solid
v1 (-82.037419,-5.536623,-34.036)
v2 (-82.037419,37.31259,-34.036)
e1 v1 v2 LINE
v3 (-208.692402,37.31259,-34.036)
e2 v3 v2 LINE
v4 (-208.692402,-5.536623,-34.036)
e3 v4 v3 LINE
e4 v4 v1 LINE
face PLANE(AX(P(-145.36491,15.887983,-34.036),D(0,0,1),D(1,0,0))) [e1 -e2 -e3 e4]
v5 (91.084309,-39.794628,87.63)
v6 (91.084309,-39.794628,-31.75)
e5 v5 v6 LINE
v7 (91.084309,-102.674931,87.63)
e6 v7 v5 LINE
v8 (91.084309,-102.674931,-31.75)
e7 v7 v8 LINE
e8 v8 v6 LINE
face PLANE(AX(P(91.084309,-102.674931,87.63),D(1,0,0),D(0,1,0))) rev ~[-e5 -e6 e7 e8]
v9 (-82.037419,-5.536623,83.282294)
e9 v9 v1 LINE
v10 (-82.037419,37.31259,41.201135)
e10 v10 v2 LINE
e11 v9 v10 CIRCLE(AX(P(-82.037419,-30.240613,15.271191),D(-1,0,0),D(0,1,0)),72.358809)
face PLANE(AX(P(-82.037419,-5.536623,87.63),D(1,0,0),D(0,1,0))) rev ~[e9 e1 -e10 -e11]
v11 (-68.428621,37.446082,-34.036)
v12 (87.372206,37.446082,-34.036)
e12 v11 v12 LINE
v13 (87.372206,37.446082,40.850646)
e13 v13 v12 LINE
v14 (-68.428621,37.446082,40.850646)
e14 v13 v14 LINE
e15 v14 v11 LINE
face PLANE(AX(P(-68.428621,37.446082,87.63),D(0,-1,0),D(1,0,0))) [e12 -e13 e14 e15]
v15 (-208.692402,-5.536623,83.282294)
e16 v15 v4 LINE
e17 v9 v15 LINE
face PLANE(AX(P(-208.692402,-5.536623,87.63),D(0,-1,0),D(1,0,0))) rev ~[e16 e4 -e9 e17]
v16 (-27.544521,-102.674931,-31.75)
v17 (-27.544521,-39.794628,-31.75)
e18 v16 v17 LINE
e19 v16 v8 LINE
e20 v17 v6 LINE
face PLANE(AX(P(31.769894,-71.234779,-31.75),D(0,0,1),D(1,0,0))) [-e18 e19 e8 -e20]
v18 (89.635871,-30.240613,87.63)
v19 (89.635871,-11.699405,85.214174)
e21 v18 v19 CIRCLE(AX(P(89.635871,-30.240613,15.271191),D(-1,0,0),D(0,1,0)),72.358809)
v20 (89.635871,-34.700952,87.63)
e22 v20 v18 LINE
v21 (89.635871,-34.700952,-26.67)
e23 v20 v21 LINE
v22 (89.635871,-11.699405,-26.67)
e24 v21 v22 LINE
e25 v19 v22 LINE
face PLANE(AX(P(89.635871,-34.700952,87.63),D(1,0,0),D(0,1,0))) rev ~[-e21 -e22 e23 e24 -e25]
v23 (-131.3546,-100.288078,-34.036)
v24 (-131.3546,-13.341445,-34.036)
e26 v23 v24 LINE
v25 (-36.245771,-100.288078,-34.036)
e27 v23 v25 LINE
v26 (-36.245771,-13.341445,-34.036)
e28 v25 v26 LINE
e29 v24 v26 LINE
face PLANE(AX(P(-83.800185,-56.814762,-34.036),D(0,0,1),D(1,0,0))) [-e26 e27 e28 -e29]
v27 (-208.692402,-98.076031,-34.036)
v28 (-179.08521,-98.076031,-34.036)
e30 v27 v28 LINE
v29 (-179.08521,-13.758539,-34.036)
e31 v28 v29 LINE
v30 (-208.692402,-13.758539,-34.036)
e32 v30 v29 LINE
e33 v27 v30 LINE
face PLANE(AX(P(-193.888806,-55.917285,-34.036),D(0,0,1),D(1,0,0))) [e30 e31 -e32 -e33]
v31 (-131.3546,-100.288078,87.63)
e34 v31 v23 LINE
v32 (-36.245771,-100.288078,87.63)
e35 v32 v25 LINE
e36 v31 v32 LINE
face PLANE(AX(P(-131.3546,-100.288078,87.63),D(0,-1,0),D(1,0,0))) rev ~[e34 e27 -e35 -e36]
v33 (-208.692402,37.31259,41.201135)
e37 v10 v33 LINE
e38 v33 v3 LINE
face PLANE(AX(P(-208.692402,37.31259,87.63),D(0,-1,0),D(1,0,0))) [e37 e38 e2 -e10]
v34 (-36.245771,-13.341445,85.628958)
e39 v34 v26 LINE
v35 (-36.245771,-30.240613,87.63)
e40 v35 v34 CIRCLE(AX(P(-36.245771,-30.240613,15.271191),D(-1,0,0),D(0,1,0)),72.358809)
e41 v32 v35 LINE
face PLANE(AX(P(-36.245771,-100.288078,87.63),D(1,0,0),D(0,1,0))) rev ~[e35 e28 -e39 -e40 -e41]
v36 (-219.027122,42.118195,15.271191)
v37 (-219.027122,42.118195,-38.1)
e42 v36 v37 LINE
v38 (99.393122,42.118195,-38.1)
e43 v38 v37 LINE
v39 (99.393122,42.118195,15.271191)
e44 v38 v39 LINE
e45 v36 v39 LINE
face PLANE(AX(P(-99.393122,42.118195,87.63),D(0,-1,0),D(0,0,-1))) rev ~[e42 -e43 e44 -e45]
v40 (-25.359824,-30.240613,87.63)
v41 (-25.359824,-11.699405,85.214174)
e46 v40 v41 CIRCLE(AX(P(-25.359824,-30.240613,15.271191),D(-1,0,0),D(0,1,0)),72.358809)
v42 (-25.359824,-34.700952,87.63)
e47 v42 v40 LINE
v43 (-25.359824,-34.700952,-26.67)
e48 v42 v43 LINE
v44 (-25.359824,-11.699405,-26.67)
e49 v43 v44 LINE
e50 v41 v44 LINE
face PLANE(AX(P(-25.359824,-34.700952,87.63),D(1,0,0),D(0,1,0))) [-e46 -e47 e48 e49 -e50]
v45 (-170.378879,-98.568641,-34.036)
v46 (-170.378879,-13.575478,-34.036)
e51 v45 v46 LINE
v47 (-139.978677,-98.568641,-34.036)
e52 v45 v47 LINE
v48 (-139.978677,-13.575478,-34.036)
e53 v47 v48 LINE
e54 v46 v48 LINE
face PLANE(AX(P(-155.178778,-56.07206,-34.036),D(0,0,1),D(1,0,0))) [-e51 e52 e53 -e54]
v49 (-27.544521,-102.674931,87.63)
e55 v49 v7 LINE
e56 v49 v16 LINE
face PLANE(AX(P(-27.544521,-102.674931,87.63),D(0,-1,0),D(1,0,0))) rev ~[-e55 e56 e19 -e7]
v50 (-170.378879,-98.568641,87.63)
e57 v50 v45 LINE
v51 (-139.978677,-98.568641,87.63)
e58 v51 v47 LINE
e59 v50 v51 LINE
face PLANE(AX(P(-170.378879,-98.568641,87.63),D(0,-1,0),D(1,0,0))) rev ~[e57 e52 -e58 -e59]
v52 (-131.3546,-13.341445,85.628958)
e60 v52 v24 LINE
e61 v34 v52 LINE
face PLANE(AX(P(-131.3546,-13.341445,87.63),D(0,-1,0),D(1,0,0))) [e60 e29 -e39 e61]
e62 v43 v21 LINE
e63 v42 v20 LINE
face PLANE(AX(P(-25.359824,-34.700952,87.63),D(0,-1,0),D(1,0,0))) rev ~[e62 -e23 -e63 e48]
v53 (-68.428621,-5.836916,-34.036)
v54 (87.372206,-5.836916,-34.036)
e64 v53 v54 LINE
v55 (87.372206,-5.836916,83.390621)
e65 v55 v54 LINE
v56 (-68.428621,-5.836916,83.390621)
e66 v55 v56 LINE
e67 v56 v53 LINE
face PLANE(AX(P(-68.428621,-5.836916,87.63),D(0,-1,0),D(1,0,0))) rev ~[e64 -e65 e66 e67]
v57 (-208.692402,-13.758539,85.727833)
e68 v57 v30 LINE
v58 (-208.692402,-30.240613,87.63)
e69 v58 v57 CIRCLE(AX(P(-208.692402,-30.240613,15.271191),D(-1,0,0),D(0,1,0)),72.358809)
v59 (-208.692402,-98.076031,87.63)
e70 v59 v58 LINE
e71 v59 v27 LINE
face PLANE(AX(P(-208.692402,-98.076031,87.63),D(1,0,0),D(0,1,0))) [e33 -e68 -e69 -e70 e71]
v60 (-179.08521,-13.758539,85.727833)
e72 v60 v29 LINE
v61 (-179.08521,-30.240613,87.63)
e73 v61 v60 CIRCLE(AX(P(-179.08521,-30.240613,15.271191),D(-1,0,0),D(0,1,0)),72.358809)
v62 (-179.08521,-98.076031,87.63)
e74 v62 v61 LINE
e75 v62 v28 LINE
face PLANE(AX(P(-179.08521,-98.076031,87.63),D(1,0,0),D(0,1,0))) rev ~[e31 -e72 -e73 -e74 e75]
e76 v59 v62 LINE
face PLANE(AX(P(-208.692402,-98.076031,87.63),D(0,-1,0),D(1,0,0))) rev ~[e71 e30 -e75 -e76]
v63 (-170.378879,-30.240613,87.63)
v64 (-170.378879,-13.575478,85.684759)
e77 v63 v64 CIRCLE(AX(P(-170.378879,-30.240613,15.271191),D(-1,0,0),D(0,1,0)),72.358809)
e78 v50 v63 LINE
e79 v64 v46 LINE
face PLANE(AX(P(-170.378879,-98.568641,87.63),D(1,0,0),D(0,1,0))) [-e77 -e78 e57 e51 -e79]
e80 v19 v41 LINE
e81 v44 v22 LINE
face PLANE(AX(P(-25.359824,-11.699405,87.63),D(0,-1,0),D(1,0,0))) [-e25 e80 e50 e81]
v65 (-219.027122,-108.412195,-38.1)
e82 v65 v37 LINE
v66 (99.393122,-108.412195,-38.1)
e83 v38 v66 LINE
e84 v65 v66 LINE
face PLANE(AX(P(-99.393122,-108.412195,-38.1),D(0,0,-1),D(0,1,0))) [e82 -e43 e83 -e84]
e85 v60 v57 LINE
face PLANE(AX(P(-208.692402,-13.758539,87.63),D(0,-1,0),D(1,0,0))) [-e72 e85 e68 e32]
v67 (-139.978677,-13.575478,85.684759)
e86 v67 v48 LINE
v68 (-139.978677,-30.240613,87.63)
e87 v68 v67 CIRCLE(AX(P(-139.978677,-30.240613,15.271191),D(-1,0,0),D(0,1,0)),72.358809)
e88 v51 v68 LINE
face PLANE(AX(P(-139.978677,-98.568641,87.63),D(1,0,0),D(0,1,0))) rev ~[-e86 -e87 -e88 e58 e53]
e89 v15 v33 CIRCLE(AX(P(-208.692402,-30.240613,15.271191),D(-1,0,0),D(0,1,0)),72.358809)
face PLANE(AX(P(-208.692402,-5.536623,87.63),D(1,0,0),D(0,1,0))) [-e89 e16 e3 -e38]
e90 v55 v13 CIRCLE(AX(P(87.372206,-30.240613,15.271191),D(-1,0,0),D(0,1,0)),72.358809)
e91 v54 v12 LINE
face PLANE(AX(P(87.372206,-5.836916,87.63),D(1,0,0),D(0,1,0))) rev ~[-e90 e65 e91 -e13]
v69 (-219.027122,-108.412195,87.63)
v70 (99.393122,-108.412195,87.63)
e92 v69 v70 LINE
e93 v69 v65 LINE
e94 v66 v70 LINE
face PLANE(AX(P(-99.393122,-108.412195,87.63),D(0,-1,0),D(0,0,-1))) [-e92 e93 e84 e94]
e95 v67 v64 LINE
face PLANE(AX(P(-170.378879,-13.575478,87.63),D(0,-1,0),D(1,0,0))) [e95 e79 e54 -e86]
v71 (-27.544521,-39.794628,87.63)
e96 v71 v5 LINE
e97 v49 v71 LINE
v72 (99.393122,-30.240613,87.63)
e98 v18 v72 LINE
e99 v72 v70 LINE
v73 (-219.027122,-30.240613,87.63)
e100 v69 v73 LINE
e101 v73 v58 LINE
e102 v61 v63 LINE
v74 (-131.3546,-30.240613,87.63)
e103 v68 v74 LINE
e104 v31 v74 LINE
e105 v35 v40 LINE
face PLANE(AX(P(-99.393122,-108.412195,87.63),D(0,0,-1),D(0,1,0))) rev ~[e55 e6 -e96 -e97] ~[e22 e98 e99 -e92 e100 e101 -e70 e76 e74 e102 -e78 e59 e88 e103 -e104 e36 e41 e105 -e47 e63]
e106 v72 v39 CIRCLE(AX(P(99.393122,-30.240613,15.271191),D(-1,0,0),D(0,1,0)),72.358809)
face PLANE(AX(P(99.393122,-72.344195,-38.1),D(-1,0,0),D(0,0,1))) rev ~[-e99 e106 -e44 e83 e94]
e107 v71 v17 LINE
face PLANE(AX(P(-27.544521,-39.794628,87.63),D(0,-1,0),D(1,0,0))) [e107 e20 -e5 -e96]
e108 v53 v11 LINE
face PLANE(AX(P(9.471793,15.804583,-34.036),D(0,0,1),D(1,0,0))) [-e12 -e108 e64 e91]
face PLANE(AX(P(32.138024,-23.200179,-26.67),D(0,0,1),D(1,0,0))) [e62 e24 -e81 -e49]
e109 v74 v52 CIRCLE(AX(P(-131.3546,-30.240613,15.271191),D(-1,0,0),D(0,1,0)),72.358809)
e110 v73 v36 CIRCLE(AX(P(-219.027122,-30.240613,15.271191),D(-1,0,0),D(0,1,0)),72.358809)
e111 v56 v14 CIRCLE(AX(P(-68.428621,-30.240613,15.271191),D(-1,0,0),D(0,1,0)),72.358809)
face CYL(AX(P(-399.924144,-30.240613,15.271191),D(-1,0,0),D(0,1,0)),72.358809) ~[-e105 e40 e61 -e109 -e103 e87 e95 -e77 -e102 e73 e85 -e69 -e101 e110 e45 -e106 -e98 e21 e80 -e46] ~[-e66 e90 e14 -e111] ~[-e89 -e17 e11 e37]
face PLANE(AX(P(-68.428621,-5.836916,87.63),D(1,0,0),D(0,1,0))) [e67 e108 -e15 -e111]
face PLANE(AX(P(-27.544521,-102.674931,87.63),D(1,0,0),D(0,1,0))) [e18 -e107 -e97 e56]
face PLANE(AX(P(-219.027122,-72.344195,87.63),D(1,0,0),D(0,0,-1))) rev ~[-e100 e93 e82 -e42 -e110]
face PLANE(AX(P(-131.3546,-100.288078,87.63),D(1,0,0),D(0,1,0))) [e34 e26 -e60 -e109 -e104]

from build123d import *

# Parameters (mm, degrees)
F0_W         = 198.7862437963
F0_H         = 84.2363908887
F1_DEPTH     = 87.63
F2_DEPTH     = 30.226
F3_DEPTH     = 38.1
F4_DEPTH     = 36.068
F5_W         = 118.6288297176
F5_H         = 62.8803037107
F6_DEPTH     = 119.38
F7_W         = 114.9956956506
F7_H         = 23.0015479028
F8_DEPTH     = 114.3
F9_DEPTH     = 216.916
F10_DEPTH    = 97.282
F11_W        = 95.1088294387
F11_H        = 86.9466327131
F14_DEPTH    = 121.666
F12_W        = 30.4002016783
F12_H        = 84.9931621924
F15_DEPTH    = 121.666
F13_W        = 29.6071916819
F13_H        = 84.3174913898
F16_DEPTH    = 121.666
F18_W        = 155.8008268476
F18_H        = 43.2829973288
F19_DEPTH    = 121.666
F17_W        = 126.6549825668
F17_H        = 42.8492124192
F20_DEPTH    = 121.666
F21_T1_DEPTH = 680.2142882536


# Not quite as in the source:
# - a fillet or chamfer that OpenCascade refuses, or shapes differently, is made with other operations: its cross-section is extruded or revolved along the edge and cut away or added


with BuildPart() as f1:
    # F0 (on Top) → F1 (new body)
    with BuildSketch(Plane.XY):
        Rectangle(F0_W, F0_H)
    extrude(amount=F1_DEPTH)

    # F2 (add): a face of the model
    f2_faces = [f1.faces().sort_by_distance(p)[0] for p in [
        (0, -42.1181954443, 43.815),
    ]]
    extrude(f2_faces, amount=F2_DEPTH)

    # F3 (add): a face of the model
    f3_faces = [f1.faces().sort_by_distance(p)[0] for p in [
        (0, -15.113, 0),
    ]]
    extrude(f3_faces, amount=F3_DEPTH)

    # F4 (add): a face of the model
    f4_faces = [f1.faces().sort_by_distance(p)[0] for p in [
        (0, -72.3441954443, 24.765),
    ]]
    extrude(f4_faces, amount=F4_DEPTH)

    # F5 (on face) → F6 (cut)
    with BuildSketch(Plane.XY.offset(87.63)):
        with Locations((31.7698940635, -71.2347794324)):
            Rectangle(F5_W, F5_H)
    extrude(amount=-F6_DEPTH, mode=Mode.SUBTRACT)

    # F7 (on face) → F8 (cut)
    with BuildSketch(Plane.XY.offset(87.63)):
        with Locations((32.1380235255, -23.2001785189)):
            Rectangle(F7_W, F7_H)
    extrude(amount=-F8_DEPTH, mode=Mode.SUBTRACT)

    # F9 (add): a face of the model
    f9_faces = [f1.faces().sort_by_distance(p)[0] for p in [
        (-99.3931218982, -33.147, 24.765),
    ]]
    extrude(f9_faces, amount=F9_DEPTH)

    # F10 (cut): a face of the model
    f10_faces = [f1.faces().sort_by_distance(p)[0] for p in [
        (-316.3091218982, -33.147, 24.765),
    ]]
    extrude(f10_faces, amount=-F10_DEPTH, mode=Mode.SUBTRACT)

    # F11 (on face) → F14 (cut)
    with BuildSketch(Plane.XY.offset(87.63)):
        with Locations((-83.8001854718, -56.8147618324)):
            Rectangle(F11_W, F11_H)
    extrude(amount=-F14_DEPTH, mode=Mode.SUBTRACT)

    # F12 (on face) → F15 (cut)
    with BuildSketch(Plane.XY.offset(87.63)):
        with Locations((-155.1787778735, -56.0720595531)):
            Rectangle(F12_W, F12_H)
    extrude(amount=-F15_DEPTH, mode=Mode.SUBTRACT)

    # F13 (on face) → F16 (cut)
    with BuildSketch(Plane.XY.offset(87.63)):
        with Locations((-193.8888058066, -55.9172849171)):
            Rectangle(F13_W, F13_H)
    extrude(amount=-F16_DEPTH, mode=Mode.SUBTRACT)

    # F18 (on face) → F19 (cut)
    with BuildSketch(Plane.XY.offset(87.63)):
        with Locations((9.4717927277, 15.8045829739)):
            Rectangle(F18_W, F18_H)
    extrude(amount=-F19_DEPTH, mode=Mode.SUBTRACT)

    # F17 (on face) → F20 (cut)
    with BuildSketch(Plane.XY.offset(87.63)):
        with Locations((-145.3649103642, 15.8879833762)):
            Rectangle(F17_W, F17_H)
    extrude(amount=-F20_DEPTH, mode=Mode.SUBTRACT)

    # F21: fillet of radius 72.3588088914 on 1 edges, made by hand

    # F21_s2 → F21_t1 (cut)
    with BuildSketch(Plane.YZ.offset(-399.9241441268)):
        with BuildLine():
            ThreePointArc((42.1181954443, 15.2711911086), (20.9247909986, 66.4365955543), (-30.2406134471, 87.63))
            Line((-30.2406134471, 87.63), (42.1181954443, 87.63))
            Line((42.1181954443, 87.63), (42.1181954443, 15.2711911086))
        make_face()
    extrude(amount=F21_T1_DEPTH, mode=Mode.SUBTRACT)


solid = f1.part
